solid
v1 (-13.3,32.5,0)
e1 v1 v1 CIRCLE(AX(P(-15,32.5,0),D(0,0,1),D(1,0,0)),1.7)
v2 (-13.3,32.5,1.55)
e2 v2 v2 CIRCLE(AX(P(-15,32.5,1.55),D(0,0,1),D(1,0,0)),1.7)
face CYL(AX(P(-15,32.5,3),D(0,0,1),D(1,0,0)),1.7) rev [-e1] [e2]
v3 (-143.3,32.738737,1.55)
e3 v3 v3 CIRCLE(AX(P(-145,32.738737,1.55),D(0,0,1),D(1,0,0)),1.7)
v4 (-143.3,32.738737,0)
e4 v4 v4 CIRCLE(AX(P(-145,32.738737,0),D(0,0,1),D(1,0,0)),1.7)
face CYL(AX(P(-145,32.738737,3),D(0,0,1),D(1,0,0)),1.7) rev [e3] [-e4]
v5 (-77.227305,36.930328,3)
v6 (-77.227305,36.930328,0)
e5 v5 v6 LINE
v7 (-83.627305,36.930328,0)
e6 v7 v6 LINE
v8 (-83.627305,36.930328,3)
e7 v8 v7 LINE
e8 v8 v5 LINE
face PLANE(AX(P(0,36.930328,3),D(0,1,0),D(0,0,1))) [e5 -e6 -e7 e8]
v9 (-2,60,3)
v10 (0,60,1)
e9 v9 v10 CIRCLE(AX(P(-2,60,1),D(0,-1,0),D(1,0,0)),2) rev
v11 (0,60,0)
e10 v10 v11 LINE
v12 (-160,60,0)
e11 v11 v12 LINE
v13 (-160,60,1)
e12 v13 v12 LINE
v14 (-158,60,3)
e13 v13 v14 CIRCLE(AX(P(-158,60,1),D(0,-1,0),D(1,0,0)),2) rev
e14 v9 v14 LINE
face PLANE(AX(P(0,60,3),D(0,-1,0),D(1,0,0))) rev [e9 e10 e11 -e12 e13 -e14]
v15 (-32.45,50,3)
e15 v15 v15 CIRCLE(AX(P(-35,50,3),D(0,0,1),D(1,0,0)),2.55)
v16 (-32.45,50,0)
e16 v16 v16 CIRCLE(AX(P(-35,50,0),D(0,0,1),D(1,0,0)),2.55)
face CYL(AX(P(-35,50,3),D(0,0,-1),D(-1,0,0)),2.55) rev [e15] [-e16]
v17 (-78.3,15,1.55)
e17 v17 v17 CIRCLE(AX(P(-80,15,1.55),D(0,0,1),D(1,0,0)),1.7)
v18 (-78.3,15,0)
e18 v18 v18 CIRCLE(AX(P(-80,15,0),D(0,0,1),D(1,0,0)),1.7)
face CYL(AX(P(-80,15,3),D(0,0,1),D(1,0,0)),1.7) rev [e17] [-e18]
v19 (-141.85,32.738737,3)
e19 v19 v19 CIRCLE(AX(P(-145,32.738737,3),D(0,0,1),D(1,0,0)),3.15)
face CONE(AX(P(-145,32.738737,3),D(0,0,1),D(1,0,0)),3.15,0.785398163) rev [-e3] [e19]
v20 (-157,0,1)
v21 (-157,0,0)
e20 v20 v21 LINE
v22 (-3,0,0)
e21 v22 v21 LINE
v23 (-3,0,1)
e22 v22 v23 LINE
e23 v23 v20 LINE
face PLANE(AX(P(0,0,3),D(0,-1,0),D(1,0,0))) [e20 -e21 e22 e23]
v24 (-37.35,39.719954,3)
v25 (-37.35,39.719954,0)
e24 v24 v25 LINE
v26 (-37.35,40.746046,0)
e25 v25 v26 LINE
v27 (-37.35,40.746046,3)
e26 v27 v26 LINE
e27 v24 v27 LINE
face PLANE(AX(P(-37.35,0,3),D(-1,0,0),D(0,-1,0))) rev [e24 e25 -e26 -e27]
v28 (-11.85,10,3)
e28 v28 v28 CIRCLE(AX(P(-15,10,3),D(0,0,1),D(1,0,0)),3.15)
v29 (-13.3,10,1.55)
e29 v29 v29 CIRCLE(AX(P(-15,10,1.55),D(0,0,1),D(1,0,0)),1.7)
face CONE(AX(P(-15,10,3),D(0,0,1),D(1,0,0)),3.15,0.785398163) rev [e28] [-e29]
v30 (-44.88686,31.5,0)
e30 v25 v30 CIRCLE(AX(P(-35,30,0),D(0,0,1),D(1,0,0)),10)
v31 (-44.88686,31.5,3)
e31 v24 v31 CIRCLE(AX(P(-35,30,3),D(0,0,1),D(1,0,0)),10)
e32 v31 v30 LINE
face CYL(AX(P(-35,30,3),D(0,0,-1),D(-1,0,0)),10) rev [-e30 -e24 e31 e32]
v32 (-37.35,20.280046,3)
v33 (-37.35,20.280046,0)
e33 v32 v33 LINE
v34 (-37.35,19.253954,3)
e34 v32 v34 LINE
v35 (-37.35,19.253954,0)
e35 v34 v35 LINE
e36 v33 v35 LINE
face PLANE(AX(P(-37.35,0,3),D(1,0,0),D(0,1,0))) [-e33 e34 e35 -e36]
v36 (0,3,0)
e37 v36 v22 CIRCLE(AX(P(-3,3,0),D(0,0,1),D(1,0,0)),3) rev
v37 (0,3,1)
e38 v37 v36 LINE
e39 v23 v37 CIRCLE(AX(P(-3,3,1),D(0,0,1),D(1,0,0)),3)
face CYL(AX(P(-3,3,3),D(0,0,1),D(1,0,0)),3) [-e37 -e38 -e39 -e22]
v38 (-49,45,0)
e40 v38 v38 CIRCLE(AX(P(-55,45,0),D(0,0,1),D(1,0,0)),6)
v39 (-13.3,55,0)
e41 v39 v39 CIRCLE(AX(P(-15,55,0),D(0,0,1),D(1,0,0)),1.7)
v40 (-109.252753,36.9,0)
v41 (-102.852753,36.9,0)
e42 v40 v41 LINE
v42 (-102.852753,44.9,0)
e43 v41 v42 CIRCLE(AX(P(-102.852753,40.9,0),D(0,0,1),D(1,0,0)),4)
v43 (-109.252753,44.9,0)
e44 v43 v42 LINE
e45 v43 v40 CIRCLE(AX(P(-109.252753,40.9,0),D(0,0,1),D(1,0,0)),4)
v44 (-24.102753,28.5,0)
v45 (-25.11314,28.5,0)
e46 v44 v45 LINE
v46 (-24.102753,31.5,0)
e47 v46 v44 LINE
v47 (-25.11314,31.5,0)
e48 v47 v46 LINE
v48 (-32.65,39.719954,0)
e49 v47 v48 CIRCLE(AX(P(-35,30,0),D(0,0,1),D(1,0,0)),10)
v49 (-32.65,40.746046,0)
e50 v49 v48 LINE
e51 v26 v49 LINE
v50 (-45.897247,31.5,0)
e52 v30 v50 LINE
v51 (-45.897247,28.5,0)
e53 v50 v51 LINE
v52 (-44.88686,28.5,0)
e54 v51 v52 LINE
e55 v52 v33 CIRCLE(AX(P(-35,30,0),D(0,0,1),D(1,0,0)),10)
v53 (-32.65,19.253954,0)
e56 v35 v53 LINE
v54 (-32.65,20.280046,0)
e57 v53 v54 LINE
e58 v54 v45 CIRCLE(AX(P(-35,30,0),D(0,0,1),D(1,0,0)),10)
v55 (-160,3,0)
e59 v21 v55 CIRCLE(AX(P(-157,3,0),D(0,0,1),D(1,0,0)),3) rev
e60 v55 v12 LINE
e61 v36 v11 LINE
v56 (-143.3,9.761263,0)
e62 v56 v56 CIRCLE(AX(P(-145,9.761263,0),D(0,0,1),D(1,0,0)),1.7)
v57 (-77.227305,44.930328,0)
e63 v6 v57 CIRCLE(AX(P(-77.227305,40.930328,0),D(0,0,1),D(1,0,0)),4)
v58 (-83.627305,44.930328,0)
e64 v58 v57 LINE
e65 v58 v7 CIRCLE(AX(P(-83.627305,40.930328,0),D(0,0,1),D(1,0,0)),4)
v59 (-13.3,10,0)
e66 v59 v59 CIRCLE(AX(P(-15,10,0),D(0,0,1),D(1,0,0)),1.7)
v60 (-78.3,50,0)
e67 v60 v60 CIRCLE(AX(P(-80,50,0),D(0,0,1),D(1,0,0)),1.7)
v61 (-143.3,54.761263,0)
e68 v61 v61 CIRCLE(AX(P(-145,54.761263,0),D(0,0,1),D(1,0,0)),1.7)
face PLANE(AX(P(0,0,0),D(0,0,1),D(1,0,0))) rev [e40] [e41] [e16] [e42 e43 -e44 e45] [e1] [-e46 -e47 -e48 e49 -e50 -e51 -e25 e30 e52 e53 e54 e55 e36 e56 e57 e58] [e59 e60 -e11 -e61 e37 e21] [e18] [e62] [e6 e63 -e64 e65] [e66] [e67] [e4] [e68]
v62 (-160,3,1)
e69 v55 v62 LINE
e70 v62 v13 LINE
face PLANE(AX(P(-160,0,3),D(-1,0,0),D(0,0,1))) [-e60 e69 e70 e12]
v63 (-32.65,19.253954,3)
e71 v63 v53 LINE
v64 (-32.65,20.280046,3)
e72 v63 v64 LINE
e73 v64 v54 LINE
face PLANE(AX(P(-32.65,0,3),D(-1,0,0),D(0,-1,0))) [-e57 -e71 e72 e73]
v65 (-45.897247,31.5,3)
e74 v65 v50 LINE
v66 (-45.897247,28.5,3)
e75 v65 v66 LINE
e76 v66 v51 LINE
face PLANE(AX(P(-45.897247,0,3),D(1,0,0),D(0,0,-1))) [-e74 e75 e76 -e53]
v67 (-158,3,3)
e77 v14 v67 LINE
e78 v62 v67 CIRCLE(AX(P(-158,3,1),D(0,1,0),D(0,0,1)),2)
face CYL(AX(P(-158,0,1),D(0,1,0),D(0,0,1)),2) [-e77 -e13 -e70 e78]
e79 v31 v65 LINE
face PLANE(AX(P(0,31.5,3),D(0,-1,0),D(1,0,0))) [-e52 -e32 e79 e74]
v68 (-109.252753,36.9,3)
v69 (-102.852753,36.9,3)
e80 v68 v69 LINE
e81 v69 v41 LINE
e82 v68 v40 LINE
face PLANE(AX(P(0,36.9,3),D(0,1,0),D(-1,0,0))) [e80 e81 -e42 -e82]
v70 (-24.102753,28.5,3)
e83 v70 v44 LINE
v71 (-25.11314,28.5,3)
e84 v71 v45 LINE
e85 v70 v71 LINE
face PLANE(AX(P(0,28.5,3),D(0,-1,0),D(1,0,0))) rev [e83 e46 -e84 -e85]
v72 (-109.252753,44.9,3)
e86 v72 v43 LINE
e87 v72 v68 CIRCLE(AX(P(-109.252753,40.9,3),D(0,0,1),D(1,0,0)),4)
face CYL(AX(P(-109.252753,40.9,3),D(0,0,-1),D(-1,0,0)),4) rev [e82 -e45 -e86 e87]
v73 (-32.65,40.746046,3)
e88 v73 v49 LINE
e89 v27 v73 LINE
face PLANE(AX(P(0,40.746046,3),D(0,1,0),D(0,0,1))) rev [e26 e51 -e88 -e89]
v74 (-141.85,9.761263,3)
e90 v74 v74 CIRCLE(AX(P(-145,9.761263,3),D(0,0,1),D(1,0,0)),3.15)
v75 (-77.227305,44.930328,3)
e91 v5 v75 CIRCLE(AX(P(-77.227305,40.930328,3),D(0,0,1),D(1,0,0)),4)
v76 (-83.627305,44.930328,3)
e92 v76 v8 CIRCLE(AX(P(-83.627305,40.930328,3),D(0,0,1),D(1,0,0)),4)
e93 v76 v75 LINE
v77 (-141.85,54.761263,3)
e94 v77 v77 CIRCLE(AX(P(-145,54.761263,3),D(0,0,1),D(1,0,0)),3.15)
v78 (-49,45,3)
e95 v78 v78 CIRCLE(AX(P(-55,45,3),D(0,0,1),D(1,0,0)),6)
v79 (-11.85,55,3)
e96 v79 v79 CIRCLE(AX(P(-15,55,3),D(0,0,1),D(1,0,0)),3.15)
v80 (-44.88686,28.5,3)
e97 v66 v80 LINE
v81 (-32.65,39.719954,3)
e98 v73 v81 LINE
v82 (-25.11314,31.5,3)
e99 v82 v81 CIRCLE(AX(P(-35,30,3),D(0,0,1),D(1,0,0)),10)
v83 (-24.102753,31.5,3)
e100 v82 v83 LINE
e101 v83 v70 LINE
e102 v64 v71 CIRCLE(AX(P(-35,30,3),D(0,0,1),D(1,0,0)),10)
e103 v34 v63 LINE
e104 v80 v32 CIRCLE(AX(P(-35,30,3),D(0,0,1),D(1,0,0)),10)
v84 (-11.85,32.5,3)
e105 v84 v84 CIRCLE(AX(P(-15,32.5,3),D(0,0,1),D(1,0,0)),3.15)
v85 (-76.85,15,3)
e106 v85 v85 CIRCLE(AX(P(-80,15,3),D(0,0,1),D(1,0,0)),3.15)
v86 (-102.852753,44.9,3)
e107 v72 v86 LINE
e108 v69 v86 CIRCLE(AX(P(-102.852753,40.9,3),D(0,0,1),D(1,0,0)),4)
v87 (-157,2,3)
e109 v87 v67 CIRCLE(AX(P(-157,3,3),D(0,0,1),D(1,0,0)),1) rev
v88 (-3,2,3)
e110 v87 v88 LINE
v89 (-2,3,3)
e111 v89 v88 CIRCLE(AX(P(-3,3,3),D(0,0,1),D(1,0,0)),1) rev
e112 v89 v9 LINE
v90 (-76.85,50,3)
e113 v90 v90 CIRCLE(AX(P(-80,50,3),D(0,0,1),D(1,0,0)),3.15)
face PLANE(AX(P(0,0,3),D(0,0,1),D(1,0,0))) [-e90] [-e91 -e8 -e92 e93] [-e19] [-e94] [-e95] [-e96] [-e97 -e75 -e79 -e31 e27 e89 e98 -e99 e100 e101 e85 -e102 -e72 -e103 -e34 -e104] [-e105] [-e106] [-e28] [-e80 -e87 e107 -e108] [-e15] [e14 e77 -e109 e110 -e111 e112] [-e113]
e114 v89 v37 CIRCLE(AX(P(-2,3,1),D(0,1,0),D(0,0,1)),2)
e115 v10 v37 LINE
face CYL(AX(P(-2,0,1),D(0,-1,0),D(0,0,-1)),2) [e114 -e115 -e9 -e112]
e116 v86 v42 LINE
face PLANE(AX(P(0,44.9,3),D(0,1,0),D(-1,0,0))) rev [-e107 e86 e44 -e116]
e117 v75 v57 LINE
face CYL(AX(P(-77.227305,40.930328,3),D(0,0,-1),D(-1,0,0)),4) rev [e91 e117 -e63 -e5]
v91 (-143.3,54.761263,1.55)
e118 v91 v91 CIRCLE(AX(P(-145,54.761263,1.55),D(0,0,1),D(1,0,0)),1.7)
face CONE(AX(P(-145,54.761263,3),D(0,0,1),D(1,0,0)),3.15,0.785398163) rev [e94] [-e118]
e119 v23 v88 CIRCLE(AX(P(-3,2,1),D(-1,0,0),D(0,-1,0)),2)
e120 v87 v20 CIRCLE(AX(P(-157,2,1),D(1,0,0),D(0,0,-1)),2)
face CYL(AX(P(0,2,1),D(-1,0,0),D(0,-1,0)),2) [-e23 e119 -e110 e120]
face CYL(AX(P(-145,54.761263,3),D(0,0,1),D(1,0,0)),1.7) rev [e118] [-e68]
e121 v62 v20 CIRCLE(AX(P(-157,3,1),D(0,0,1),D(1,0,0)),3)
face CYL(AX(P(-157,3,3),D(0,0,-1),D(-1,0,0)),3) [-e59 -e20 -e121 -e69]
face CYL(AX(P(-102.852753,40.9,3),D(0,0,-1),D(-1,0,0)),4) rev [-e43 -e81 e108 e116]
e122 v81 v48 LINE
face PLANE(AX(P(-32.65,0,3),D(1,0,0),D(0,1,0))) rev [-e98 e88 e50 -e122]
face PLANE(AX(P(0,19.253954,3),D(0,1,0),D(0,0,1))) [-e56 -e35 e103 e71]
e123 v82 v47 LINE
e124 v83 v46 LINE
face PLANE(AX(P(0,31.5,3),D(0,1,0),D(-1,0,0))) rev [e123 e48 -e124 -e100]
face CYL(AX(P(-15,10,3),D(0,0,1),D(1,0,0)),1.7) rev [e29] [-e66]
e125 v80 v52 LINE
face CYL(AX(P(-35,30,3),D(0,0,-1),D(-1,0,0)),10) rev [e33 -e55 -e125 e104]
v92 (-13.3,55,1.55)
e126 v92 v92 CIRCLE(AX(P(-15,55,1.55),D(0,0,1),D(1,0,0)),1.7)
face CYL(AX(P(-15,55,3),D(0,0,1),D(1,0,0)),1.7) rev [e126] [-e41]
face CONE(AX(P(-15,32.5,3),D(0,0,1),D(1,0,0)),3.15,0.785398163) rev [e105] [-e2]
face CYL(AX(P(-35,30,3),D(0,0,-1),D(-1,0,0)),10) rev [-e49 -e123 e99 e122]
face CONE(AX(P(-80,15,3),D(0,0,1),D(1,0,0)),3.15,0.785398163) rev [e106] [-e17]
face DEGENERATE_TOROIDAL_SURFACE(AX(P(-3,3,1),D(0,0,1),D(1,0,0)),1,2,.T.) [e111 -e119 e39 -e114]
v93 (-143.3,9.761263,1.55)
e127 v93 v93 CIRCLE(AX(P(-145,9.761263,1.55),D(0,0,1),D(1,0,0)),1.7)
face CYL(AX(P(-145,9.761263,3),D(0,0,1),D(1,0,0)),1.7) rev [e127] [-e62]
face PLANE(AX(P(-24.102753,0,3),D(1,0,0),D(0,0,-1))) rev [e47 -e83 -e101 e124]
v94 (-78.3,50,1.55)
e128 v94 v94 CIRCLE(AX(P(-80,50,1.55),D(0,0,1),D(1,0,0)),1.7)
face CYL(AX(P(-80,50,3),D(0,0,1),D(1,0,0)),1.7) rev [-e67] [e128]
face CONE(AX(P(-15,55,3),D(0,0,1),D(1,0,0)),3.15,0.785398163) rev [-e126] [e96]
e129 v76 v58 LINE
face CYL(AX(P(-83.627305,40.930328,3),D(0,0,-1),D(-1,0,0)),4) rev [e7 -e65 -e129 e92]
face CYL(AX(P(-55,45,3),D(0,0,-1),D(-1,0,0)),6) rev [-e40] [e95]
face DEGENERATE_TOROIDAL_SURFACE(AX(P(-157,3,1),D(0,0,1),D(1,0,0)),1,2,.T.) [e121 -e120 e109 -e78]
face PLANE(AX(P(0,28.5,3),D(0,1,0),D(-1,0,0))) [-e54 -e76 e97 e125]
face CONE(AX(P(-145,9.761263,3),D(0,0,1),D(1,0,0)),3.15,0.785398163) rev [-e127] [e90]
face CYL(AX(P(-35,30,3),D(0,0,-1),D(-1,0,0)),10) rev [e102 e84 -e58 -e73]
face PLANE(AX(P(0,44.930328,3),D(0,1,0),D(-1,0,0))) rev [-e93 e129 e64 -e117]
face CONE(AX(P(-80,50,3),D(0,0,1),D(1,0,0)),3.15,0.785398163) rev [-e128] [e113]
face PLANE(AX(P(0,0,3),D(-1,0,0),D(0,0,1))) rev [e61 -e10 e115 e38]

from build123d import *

# Parameters (mm, degrees)
SKETCH11_W                                     = 160
SKETCH11_H                                     = 60
SKETCH11_R                                     = 2.55
SKETCH11_R_2                                   = 6
BOSS_EXTRUDE1_DEPTH                            = 3
FILLET1_R                                      = 2
FILLET3_R                                      = 3
CSK_FOR_M3_FLAT_HEAD_MACHINE_SCREW1_AT_2_COUNT = 2
CSK_FOR_M3_FLAT_HEAD_MACHINE_SCREW1_AT_2_PITCH = 22.022525482
CSK_FOR_M3_FLAT_HEAD_MACHINE_SCREW1_AT_3_COUNT = 2
CSK_FOR_M3_FLAT_HEAD_MACHINE_SCREW1_AT_3_PITCH = 45
CSK_FOR_M3_FLAT_HEAD_MACHINE_SCREW1_AT_4_COUNT = 2
CSK_FOR_M3_FLAT_HEAD_MACHINE_SCREW1_AT_4_PITCH = 137.490256535
CSK_FOR_M3_FLAT_HEAD_MACHINE_SCREW1_AT_5_COUNT = 2
CSK_FOR_M3_FLAT_HEAD_MACHINE_SCREW1_AT_5_PITCH = 131.892243209
CSK_FOR_M3_FLAT_HEAD_MACHINE_SCREW1_AT_6_COUNT = 2
CSK_FOR_M3_FLAT_HEAD_MACHINE_SCREW1_AT_6_PITCH = 130.000219213
CSK_FOR_M3_FLAT_HEAD_MACHINE_SCREW1_AT_7_COUNT = 2
CSK_FOR_M3_FLAT_HEAD_MACHINE_SCREW1_AT_7_PITCH = 65.174148425
CSK_FOR_M3_FLAT_HEAD_MACHINE_SCREW1_AT_8_COUNT = 2
CSK_FOR_M3_FLAT_HEAD_MACHINE_SCREW1_AT_8_PITCH = 76.196837301


with BuildPart() as part:
    # Sketch11 → Boss-Extrude1 (new body)
    with BuildSketch(Plane.XY):
        with Locations((-80, 30)):
            Rectangle(SKETCH11_W, SKETCH11_H)
        with Locations((-35, 50)):
            Circle(SKETCH11_R, mode=Mode.SUBTRACT)
        with Locations((-55, 45)):
            Circle(SKETCH11_R_2, mode=Mode.SUBTRACT)
        with BuildLine():
            Line((-44.886859967, 31.5), (-45.897247359, 31.5))
            Line((-45.897247359, 31.5), (-45.897247359, 28.5))
            Line((-45.897247359, 28.5), (-44.886859967, 28.5))
            ThreePointArc((-44.886859967, 28.5), (-42.370691635, 23.241826814), (-37.35, 20.280046296))
            Line((-37.35, 20.280046296), (-37.35, 19.253954216))
            Line((-37.35, 19.253954216), (-32.65, 19.253954216))
            Line((-32.65, 19.253954216), (-32.65, 20.280046296))
            ThreePointArc((-32.65, 20.280046296), (-27.629308365, 23.241826814), (-25.113140033, 28.5))
            Line((-25.113140033, 28.5), (-24.102752641, 28.5))
            Line((-24.102752641, 28.5), (-24.102752641, 31.5))
            Line((-24.102752641, 31.5), (-25.113140033, 31.5))
            ThreePointArc((-25.113140033, 31.5), (-27.629308365, 36.758173186), (-32.65, 39.719953704))
            Line((-32.65, 39.719953704), (-32.65, 40.746045784))
            Line((-32.65, 40.746045784), (-37.35, 40.746045784))
            Line((-37.35, 40.746045784), (-37.35, 39.719953704))
            ThreePointArc((-37.35, 39.719953704), (-42.370691635, 36.758173186), (-44.886859967, 31.5))
        make_face(mode=Mode.SUBTRACT)
        with BuildLine():
            Line((-83.627304882, 44.930328357), (-77.227304882, 44.930328357))
            ThreePointArc((-77.227304882, 44.930328357), (-73.227304882, 40.930328357), (-77.227304882, 36.930328357))
            Line((-77.227304882, 36.930328357), (-83.627304882, 36.930328357))
            ThreePointArc((-83.627304882, 36.930328357), (-87.627304882, 40.930328357), (-83.627304882, 44.930328357))
        make_face(mode=Mode.SUBTRACT)
        with BuildLine():
            Line((-109.252753418, 44.9), (-102.852753418, 44.9))
            ThreePointArc((-102.852753418, 44.9), (-98.852753418, 40.9), (-102.852753418, 36.9))
            Line((-102.852753418, 36.9), (-109.252753418, 36.9))
            ThreePointArc((-109.252753418, 36.9), (-113.252753418, 40.9), (-109.252753418, 44.9))
        make_face(mode=Mode.SUBTRACT)
    extrude(amount=BOSS_EXTRUDE1_DEPTH)

    # Fillet1
    fillet1_edges = [part.edges().sort_by_distance(p)[0] for p in [
        (-160, 30, 3),
        (-80, 0, 3),
        (0, 30, 3),
    ]]
    fillet(fillet1_edges, radius=FILLET1_R)

    # Fillet3
    # the kernel refuses this fillet: 3 mm, written as the material it takes off along each edge
    with BuildSketch(Plane(origin=(-3, 3, 3), x_dir=(0, -1, 0), z_dir=(-1, 0, 0))) as fillet3_piece_1:
        with BuildLine():
            CenterArc((1, -2), 2, 0, 90)
            Line((3, -2), (3, 0))
            Line((3, 0), (1, 0))
        make_face()
    revolve(axis=Axis((-3, 3, 3), (0, 0, 1)), revolution_arc=90, mode=Mode.SUBTRACT)
    with BuildSketch(Plane(origin=(-157, 3, 3), x_dir=(-1, 0, 0), z_dir=(0, 1, 0))) as fillet3_piece_2:
        with BuildLine():
            CenterArc((1, -2), 2, 0, 90)
            Line((3, -2), (3, 0))
            Line((3, 0), (1, 0))
        make_face()
    revolve(axis=Axis((-157, 3, 3), (0, 0, 1)), revolution_arc=90, mode=Mode.SUBTRACT)
    with BuildSketch(Plane(origin=(0, 0, -7.5), x_dir=(-1, 0, 0), z_dir=(0, 0, 1))) as fillet3_piece_3:
        with BuildLine():
            CenterArc((FILLET3_R, -FILLET3_R), FILLET3_R, 90, 90)
            Line((0, -FILLET3_R), (0, 0))
            Line((0, 0), (FILLET3_R, 0))
        make_face()
    extrude(amount=10.5, mode=Mode.SUBTRACT)
    with BuildSketch(Plane(origin=(-160, 0, -7.5), x_dir=(1, 0, 0), z_dir=(0, 0, 1))) as fillet3_piece_4:
        with BuildLine():
            CenterArc((FILLET3_R, FILLET3_R), FILLET3_R, 180, 90)
            Line((0, FILLET3_R), (0, 0))
            Line((0, 0), (FILLET3_R, 0))
        make_face()
    extrude(amount=10.5, mode=Mode.SUBTRACT)

    # Sketch13 → CSK for M3 Flat Head Machine Screw1 (revolve, cut)
    with BuildSketch(Plane(origin=(-145, 54.761262741, 3), x_dir=(0, -1, 0), z_dir=(1, 0, 0))):
        Polygon((0, 0), (0, 3), (1.7, 3), (1.7, 1.45), (3.15, 0), align=None)
    csk_for_m3_flat_head_machine_screw1 = revolve(axis=Axis((-145, 54.761262741, 9.35), (0, 0, -1)), mode=Mode.SUBTRACT)

    # CSK for M3 Flat Head Machine Screw1 at 2: CSK for M3 Flat Head Machine Screw1 ×2
    with Locations(*[(0, -i * CSK_FOR_M3_FLAT_HEAD_MACHINE_SCREW1_AT_2_PITCH, 0) for i in range(1, CSK_FOR_M3_FLAT_HEAD_MACHINE_SCREW1_AT_2_COUNT)]):
        add(csk_for_m3_flat_head_machine_screw1, mode=Mode.SUBTRACT)

    # CSK for M3 Flat Head Machine Screw1 at 3: CSK for M3 Flat Head Machine Screw1 ×2
    with Locations(*[(0, -i * CSK_FOR_M3_FLAT_HEAD_MACHINE_SCREW1_AT_3_PITCH, 0) for i in range(1, CSK_FOR_M3_FLAT_HEAD_MACHINE_SCREW1_AT_3_COUNT)]):
        add(csk_for_m3_flat_head_machine_screw1, mode=Mode.SUBTRACT)

    # CSK for M3 Flat Head Machine Screw1 at 4: CSK for M3 Flat Head Machine Screw1 ×2
    with Locations(*[Vector(0.9455215465875816, -0.3255595259528246, 0) * (i * CSK_FOR_M3_FLAT_HEAD_MACHINE_SCREW1_AT_4_PITCH) for i in range(1, CSK_FOR_M3_FLAT_HEAD_MACHINE_SCREW1_AT_4_COUNT)]):
        add(csk_for_m3_flat_head_machine_screw1, mode=Mode.SUBTRACT)

    # CSK for M3 Flat Head Machine Screw1 at 5: CSK for M3 Flat Head Machine Screw1 ×2
    with Locations(*[Vector(0.9856531122424032, -0.16878371463759412, 0) * (i * CSK_FOR_M3_FLAT_HEAD_MACHINE_SCREW1_AT_5_PITCH) for i in range(1, CSK_FOR_M3_FLAT_HEAD_MACHINE_SCREW1_AT_5_COUNT)]):
        add(csk_for_m3_flat_head_machine_screw1, mode=Mode.SUBTRACT)

    # CSK for M3 Flat Head Machine Screw1 at 6: CSK for M3 Flat Head Machine Screw1 ×2
    with Locations(*[Vector(0.9999983137474917, 0.0018364373589019598, 0) * (i * CSK_FOR_M3_FLAT_HEAD_MACHINE_SCREW1_AT_6_PITCH) for i in range(1, CSK_FOR_M3_FLAT_HEAD_MACHINE_SCREW1_AT_6_COUNT)]):
        add(csk_for_m3_flat_head_machine_screw1, mode=Mode.SUBTRACT)

    # CSK for M3 Flat Head Machine Screw1 at 7: CSK for M3 Flat Head Machine Screw1 ×2
    with Locations(*[Vector(0.9973279524332378, -0.0730544680038502, 0) * (i * CSK_FOR_M3_FLAT_HEAD_MACHINE_SCREW1_AT_7_PITCH) for i in range(1, CSK_FOR_M3_FLAT_HEAD_MACHINE_SCREW1_AT_7_COUNT)]):
        add(csk_for_m3_flat_head_machine_screw1, mode=Mode.SUBTRACT)

    # CSK for M3 Flat Head Machine Screw1 at 8: CSK for M3 Flat Head Machine Screw1 ×2
    with Locations(*[Vector(0.8530537788971958, -0.5218230066882967, 0) * (i * CSK_FOR_M3_FLAT_HEAD_MACHINE_SCREW1_AT_8_PITCH) for i in range(1, CSK_FOR_M3_FLAT_HEAD_MACHINE_SCREW1_AT_8_COUNT)]):
        add(csk_for_m3_flat_head_machine_screw1, mode=Mode.SUBTRACT)


solid = part.part
